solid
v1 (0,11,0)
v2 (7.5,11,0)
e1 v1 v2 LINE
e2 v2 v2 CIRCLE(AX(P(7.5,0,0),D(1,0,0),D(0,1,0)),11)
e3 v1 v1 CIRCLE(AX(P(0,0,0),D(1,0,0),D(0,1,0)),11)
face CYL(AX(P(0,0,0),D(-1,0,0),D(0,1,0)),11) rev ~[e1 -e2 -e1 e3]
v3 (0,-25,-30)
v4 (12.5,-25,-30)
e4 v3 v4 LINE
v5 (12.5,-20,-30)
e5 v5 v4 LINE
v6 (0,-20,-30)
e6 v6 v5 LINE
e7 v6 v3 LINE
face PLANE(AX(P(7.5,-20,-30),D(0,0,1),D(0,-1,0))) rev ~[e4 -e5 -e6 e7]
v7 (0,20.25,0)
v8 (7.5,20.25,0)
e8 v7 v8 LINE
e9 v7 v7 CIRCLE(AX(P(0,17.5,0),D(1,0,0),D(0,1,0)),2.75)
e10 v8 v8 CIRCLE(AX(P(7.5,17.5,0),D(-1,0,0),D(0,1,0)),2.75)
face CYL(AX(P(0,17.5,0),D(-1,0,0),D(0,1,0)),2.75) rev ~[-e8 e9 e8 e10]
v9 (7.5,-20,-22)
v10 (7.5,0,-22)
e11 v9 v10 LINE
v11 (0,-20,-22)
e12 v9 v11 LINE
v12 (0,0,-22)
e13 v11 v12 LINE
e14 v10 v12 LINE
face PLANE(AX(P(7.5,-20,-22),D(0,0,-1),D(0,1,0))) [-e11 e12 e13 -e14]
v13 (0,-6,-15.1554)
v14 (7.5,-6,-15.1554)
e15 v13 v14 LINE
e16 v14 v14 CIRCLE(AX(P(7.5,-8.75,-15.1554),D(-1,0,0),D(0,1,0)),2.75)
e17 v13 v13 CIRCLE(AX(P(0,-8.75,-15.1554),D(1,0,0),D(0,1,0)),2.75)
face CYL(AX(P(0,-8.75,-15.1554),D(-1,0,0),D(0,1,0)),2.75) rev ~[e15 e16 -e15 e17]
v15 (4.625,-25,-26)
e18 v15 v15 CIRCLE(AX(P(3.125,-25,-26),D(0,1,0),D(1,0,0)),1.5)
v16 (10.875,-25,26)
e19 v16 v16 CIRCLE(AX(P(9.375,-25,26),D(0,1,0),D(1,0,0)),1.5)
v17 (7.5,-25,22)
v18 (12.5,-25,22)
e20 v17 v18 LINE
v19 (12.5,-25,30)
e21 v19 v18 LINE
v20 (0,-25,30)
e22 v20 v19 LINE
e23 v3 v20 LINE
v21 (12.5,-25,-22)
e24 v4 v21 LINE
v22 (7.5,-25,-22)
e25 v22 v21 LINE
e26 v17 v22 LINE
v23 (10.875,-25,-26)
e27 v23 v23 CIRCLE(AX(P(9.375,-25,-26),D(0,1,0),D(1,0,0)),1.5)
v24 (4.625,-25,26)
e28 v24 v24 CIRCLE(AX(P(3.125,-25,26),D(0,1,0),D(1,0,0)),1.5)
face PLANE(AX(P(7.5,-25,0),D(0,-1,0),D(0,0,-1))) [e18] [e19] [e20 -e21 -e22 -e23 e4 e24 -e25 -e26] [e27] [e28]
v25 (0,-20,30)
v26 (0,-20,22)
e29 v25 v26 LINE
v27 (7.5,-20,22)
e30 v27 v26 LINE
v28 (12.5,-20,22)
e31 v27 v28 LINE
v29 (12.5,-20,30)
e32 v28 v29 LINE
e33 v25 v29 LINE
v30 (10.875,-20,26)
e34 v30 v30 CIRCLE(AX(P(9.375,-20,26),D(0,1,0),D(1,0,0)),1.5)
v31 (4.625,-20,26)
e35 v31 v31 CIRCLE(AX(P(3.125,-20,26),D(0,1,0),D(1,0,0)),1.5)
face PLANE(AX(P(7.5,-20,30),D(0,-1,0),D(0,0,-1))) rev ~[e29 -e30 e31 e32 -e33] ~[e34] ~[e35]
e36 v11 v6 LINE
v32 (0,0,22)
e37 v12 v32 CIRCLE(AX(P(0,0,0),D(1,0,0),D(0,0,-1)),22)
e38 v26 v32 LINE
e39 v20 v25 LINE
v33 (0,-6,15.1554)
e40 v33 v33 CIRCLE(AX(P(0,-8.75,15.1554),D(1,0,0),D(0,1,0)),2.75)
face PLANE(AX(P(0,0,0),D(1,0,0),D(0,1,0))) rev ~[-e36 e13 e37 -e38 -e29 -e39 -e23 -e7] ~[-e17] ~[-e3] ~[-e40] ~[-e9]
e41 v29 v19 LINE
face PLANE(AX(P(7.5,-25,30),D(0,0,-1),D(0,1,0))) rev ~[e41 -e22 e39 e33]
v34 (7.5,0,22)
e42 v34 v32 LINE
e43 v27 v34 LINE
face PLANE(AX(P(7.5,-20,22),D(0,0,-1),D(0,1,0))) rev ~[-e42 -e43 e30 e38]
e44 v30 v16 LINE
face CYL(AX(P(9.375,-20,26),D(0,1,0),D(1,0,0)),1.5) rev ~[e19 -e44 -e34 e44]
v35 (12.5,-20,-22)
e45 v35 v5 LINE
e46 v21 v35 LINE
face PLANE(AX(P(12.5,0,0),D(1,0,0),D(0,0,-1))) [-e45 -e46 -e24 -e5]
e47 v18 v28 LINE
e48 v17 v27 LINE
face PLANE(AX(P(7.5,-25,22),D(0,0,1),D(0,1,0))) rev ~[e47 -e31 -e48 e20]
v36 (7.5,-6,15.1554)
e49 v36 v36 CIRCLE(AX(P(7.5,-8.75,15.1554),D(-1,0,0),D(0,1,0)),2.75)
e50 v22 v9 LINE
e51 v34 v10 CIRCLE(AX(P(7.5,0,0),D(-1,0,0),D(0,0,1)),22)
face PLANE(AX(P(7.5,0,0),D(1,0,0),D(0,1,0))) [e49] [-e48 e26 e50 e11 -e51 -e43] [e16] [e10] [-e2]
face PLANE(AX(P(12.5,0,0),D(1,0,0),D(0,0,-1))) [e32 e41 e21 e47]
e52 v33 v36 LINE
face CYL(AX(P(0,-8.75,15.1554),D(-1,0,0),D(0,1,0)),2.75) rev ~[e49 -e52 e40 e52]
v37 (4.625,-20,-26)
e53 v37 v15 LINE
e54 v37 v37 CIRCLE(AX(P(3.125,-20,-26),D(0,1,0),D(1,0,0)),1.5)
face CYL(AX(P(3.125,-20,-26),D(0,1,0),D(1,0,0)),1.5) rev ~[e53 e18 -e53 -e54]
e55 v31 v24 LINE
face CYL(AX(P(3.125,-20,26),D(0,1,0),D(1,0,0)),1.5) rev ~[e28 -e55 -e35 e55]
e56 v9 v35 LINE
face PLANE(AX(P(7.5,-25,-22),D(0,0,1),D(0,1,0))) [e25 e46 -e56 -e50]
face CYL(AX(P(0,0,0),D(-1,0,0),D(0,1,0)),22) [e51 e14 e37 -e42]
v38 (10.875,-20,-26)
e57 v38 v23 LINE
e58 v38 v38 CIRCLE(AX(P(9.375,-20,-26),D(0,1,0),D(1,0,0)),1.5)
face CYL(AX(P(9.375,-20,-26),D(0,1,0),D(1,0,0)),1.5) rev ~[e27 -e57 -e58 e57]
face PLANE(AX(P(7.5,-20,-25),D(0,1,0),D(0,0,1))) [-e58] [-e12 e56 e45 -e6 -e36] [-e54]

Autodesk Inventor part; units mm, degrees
ref_plane "YZ Plane" through (0, 0, 0) normal (1, 0, 0) x (0, 1, 0)
ref_plane "XZ Plane" through (0, 0, 0) normal (0, 1, 0) x (-1, 0, 0)
ref_plane "XY Plane" through (0, 0, 0) normal (0, 0, 1) x (1, 0, 0)
sketch "Sketch1" plane through (0, 0, 0) normal (1, 0, 0) x (0, 1, 0)
  circle A0 centre (0, 0) radius 11
  circle A1 centre (0, 0) radius 22
  circle A2 centre (0, 0) radius 17.5
  circle A3 centre (17.5, 0) radius 2.75
  circle A4 centre (-8.75, 15.1554) radius 2.75
  circle A5 centre (-8.75, -15.1554) radius 2.75
  dimension "d2" = 35
  dimension "d0" = 22
  dimension "d1" = 44
  dimension "d3" = 5.5
  dimension "d6" = 360
extrude "Extrusion1" add sketch "Sketch1" along normal blind 7.5 contours A1 | A3 A2 A5 A4
sketch "Sketch2" plane through (7.5, 0, 0) normal (1, 0, 0) x (0, 0, -1)
  arc A0 (2.7415, 17.2839) -> (-2.7415, 17.2839) centre (0, 0) ccw projected
  circle A1 centre (0, 0) radius 17.5
  circle A2 centre (0, 17.5) radius 2.75
  circle A3 centre (-15.1554, -8.75) radius 2.75
  circle A4 centre (15.1554, -8.75) radius 2.75
  dimension "d10" = 35
  dimension "d11" = 5.5
  dimension "d14" = 360
extrude "Extrusion2" cut sketch "Sketch2" against normal blind 10 contours A2 A0 | A0 A2 | A3 A1 | A1 A3 | A4 A1 | A1 A4
sketch "Sketch3" plane through (7.5, 0, 0) normal (1, 0, 0) x (0, 0, -1)
  line L0 (0, 0) -> (0, -25)
  line L1 (0, 0) -> (25, 0) construction
  line L2 (0, -25) -> (50, -25)
  line L3 (0, -25) -> (25, -25)
  line L4 (25, -25) -> (25, -20)
  line L5 (25, -20) -> (0, -20)
  line L6 (0, -20) -> (0, -25)
  line L7 (0, -20) -> (30, -20)
  line L8 (30, -20) -> (30, -25)
  line L9 (30, -25) -> (0, -25)
  line L10 (0, -25) -> (0, -20)
  line L11 (30, -25) -> (-30, -25)
  line L12 (-30, -25) -> (-30, -20)
  line L13 (-30, -20) -> (30, -20)
  line L14 (30, -20) -> (30, -25)
  circle A0 centre (0, 0) radius 22 projected
  line L15 (25, -25) -> (-22, -25)
  line L16 (-22, -25) -> (-22, 0)
  line L17 (-22, 0) -> (25, 0)
  line L18 (22, 0) -> (-22, 0)
  line L19 (-22, 0) -> (-22, -25)
  line L20 (-22, -25) -> (22, -25)
  line L21 (22, -25) -> (22, 0)
  line L22 (30, -20) -> (22, -20)
  line L23 (22, -20) -> (22, -25)
  line L24 (22, -25) -> (30, -25)
  line L25 (30, -25) -> (30, -20)
  line L26 (-30, -20) -> (-22, -20)
  line L27 (-22, -20) -> (-22, -25)
  line L28 (-22, -25) -> (-30, -25)
  line L29 (-30, -25) -> (-30, -20)
  dimension "d18" = 25
  dimension "d19" = 90
  dimension "d20" = 50
  dimension "d21" = 25
  dimension "d22" = 5
  dimension "d23" = 30
  dimension "d24" = 5
  dimension "d25" = 60
  dimension "d26" = 5
extrude "Extrusion3" add sketch "Sketch3" against normal blind 7.5 contours L5 A0 L0 | A0 L13 L16 | L21 L5 A0 | A0 L5 L21 L2 L0 | L0 L11 L16 L13 A0 | L16 L11 L12 L13 | L5 L4 L2 L21 | L7 L8 L2 L4
sketch "Sketch5" plane through (7.5, 0, 0) normal (1, 0, 0) x (0, 0, -1)
  line L0 (30, -20) -> (30, -25) projected
  line L1 (22, -20) -> (30, -20) projected
  line L2 (30, -25) -> (22, -25)
  line L3 (22, -25) -> (22, -20)
  line L4 (22, -20) -> (30, -20)
  line L5 (30, -20) -> (30, -25)
  line L6 (-30, -20) -> (-30, -25) projected
  line L7 (-30, -25) -> (-22, -25)
  line L8 (-22, -25) -> (-22, -20)
  line L9 (-22, -20) -> (-30, -20)
  line L10 (-30, -20) -> (-30, -25)
  point P0 (0, 0)
extrude "Extrusion5" add sketch "Sketch5" along normal blind 5
sketch "Sketch8" plane through (0, -20, 30) normal (0, 1, 0) x (1, 0, 0)
  circle A0 centre (3.125, 4) radius 1.5
  circle A1 centre (9.375, 4) radius 1.5
  circle A2 centre (9.375, 56) radius 1.5
  circle A3 centre (3.125, 56) radius 1.5
  point P0 (0, 8)
  point P1 (12.5, 0)
  point P2 (12.5, 52)
  point P3 (0, 60)
  point P4 (0, 52)
extrude "Extrusion7" cut sketch "Sketch8" against normal blind 5
properties part number "Slipring_mount"
